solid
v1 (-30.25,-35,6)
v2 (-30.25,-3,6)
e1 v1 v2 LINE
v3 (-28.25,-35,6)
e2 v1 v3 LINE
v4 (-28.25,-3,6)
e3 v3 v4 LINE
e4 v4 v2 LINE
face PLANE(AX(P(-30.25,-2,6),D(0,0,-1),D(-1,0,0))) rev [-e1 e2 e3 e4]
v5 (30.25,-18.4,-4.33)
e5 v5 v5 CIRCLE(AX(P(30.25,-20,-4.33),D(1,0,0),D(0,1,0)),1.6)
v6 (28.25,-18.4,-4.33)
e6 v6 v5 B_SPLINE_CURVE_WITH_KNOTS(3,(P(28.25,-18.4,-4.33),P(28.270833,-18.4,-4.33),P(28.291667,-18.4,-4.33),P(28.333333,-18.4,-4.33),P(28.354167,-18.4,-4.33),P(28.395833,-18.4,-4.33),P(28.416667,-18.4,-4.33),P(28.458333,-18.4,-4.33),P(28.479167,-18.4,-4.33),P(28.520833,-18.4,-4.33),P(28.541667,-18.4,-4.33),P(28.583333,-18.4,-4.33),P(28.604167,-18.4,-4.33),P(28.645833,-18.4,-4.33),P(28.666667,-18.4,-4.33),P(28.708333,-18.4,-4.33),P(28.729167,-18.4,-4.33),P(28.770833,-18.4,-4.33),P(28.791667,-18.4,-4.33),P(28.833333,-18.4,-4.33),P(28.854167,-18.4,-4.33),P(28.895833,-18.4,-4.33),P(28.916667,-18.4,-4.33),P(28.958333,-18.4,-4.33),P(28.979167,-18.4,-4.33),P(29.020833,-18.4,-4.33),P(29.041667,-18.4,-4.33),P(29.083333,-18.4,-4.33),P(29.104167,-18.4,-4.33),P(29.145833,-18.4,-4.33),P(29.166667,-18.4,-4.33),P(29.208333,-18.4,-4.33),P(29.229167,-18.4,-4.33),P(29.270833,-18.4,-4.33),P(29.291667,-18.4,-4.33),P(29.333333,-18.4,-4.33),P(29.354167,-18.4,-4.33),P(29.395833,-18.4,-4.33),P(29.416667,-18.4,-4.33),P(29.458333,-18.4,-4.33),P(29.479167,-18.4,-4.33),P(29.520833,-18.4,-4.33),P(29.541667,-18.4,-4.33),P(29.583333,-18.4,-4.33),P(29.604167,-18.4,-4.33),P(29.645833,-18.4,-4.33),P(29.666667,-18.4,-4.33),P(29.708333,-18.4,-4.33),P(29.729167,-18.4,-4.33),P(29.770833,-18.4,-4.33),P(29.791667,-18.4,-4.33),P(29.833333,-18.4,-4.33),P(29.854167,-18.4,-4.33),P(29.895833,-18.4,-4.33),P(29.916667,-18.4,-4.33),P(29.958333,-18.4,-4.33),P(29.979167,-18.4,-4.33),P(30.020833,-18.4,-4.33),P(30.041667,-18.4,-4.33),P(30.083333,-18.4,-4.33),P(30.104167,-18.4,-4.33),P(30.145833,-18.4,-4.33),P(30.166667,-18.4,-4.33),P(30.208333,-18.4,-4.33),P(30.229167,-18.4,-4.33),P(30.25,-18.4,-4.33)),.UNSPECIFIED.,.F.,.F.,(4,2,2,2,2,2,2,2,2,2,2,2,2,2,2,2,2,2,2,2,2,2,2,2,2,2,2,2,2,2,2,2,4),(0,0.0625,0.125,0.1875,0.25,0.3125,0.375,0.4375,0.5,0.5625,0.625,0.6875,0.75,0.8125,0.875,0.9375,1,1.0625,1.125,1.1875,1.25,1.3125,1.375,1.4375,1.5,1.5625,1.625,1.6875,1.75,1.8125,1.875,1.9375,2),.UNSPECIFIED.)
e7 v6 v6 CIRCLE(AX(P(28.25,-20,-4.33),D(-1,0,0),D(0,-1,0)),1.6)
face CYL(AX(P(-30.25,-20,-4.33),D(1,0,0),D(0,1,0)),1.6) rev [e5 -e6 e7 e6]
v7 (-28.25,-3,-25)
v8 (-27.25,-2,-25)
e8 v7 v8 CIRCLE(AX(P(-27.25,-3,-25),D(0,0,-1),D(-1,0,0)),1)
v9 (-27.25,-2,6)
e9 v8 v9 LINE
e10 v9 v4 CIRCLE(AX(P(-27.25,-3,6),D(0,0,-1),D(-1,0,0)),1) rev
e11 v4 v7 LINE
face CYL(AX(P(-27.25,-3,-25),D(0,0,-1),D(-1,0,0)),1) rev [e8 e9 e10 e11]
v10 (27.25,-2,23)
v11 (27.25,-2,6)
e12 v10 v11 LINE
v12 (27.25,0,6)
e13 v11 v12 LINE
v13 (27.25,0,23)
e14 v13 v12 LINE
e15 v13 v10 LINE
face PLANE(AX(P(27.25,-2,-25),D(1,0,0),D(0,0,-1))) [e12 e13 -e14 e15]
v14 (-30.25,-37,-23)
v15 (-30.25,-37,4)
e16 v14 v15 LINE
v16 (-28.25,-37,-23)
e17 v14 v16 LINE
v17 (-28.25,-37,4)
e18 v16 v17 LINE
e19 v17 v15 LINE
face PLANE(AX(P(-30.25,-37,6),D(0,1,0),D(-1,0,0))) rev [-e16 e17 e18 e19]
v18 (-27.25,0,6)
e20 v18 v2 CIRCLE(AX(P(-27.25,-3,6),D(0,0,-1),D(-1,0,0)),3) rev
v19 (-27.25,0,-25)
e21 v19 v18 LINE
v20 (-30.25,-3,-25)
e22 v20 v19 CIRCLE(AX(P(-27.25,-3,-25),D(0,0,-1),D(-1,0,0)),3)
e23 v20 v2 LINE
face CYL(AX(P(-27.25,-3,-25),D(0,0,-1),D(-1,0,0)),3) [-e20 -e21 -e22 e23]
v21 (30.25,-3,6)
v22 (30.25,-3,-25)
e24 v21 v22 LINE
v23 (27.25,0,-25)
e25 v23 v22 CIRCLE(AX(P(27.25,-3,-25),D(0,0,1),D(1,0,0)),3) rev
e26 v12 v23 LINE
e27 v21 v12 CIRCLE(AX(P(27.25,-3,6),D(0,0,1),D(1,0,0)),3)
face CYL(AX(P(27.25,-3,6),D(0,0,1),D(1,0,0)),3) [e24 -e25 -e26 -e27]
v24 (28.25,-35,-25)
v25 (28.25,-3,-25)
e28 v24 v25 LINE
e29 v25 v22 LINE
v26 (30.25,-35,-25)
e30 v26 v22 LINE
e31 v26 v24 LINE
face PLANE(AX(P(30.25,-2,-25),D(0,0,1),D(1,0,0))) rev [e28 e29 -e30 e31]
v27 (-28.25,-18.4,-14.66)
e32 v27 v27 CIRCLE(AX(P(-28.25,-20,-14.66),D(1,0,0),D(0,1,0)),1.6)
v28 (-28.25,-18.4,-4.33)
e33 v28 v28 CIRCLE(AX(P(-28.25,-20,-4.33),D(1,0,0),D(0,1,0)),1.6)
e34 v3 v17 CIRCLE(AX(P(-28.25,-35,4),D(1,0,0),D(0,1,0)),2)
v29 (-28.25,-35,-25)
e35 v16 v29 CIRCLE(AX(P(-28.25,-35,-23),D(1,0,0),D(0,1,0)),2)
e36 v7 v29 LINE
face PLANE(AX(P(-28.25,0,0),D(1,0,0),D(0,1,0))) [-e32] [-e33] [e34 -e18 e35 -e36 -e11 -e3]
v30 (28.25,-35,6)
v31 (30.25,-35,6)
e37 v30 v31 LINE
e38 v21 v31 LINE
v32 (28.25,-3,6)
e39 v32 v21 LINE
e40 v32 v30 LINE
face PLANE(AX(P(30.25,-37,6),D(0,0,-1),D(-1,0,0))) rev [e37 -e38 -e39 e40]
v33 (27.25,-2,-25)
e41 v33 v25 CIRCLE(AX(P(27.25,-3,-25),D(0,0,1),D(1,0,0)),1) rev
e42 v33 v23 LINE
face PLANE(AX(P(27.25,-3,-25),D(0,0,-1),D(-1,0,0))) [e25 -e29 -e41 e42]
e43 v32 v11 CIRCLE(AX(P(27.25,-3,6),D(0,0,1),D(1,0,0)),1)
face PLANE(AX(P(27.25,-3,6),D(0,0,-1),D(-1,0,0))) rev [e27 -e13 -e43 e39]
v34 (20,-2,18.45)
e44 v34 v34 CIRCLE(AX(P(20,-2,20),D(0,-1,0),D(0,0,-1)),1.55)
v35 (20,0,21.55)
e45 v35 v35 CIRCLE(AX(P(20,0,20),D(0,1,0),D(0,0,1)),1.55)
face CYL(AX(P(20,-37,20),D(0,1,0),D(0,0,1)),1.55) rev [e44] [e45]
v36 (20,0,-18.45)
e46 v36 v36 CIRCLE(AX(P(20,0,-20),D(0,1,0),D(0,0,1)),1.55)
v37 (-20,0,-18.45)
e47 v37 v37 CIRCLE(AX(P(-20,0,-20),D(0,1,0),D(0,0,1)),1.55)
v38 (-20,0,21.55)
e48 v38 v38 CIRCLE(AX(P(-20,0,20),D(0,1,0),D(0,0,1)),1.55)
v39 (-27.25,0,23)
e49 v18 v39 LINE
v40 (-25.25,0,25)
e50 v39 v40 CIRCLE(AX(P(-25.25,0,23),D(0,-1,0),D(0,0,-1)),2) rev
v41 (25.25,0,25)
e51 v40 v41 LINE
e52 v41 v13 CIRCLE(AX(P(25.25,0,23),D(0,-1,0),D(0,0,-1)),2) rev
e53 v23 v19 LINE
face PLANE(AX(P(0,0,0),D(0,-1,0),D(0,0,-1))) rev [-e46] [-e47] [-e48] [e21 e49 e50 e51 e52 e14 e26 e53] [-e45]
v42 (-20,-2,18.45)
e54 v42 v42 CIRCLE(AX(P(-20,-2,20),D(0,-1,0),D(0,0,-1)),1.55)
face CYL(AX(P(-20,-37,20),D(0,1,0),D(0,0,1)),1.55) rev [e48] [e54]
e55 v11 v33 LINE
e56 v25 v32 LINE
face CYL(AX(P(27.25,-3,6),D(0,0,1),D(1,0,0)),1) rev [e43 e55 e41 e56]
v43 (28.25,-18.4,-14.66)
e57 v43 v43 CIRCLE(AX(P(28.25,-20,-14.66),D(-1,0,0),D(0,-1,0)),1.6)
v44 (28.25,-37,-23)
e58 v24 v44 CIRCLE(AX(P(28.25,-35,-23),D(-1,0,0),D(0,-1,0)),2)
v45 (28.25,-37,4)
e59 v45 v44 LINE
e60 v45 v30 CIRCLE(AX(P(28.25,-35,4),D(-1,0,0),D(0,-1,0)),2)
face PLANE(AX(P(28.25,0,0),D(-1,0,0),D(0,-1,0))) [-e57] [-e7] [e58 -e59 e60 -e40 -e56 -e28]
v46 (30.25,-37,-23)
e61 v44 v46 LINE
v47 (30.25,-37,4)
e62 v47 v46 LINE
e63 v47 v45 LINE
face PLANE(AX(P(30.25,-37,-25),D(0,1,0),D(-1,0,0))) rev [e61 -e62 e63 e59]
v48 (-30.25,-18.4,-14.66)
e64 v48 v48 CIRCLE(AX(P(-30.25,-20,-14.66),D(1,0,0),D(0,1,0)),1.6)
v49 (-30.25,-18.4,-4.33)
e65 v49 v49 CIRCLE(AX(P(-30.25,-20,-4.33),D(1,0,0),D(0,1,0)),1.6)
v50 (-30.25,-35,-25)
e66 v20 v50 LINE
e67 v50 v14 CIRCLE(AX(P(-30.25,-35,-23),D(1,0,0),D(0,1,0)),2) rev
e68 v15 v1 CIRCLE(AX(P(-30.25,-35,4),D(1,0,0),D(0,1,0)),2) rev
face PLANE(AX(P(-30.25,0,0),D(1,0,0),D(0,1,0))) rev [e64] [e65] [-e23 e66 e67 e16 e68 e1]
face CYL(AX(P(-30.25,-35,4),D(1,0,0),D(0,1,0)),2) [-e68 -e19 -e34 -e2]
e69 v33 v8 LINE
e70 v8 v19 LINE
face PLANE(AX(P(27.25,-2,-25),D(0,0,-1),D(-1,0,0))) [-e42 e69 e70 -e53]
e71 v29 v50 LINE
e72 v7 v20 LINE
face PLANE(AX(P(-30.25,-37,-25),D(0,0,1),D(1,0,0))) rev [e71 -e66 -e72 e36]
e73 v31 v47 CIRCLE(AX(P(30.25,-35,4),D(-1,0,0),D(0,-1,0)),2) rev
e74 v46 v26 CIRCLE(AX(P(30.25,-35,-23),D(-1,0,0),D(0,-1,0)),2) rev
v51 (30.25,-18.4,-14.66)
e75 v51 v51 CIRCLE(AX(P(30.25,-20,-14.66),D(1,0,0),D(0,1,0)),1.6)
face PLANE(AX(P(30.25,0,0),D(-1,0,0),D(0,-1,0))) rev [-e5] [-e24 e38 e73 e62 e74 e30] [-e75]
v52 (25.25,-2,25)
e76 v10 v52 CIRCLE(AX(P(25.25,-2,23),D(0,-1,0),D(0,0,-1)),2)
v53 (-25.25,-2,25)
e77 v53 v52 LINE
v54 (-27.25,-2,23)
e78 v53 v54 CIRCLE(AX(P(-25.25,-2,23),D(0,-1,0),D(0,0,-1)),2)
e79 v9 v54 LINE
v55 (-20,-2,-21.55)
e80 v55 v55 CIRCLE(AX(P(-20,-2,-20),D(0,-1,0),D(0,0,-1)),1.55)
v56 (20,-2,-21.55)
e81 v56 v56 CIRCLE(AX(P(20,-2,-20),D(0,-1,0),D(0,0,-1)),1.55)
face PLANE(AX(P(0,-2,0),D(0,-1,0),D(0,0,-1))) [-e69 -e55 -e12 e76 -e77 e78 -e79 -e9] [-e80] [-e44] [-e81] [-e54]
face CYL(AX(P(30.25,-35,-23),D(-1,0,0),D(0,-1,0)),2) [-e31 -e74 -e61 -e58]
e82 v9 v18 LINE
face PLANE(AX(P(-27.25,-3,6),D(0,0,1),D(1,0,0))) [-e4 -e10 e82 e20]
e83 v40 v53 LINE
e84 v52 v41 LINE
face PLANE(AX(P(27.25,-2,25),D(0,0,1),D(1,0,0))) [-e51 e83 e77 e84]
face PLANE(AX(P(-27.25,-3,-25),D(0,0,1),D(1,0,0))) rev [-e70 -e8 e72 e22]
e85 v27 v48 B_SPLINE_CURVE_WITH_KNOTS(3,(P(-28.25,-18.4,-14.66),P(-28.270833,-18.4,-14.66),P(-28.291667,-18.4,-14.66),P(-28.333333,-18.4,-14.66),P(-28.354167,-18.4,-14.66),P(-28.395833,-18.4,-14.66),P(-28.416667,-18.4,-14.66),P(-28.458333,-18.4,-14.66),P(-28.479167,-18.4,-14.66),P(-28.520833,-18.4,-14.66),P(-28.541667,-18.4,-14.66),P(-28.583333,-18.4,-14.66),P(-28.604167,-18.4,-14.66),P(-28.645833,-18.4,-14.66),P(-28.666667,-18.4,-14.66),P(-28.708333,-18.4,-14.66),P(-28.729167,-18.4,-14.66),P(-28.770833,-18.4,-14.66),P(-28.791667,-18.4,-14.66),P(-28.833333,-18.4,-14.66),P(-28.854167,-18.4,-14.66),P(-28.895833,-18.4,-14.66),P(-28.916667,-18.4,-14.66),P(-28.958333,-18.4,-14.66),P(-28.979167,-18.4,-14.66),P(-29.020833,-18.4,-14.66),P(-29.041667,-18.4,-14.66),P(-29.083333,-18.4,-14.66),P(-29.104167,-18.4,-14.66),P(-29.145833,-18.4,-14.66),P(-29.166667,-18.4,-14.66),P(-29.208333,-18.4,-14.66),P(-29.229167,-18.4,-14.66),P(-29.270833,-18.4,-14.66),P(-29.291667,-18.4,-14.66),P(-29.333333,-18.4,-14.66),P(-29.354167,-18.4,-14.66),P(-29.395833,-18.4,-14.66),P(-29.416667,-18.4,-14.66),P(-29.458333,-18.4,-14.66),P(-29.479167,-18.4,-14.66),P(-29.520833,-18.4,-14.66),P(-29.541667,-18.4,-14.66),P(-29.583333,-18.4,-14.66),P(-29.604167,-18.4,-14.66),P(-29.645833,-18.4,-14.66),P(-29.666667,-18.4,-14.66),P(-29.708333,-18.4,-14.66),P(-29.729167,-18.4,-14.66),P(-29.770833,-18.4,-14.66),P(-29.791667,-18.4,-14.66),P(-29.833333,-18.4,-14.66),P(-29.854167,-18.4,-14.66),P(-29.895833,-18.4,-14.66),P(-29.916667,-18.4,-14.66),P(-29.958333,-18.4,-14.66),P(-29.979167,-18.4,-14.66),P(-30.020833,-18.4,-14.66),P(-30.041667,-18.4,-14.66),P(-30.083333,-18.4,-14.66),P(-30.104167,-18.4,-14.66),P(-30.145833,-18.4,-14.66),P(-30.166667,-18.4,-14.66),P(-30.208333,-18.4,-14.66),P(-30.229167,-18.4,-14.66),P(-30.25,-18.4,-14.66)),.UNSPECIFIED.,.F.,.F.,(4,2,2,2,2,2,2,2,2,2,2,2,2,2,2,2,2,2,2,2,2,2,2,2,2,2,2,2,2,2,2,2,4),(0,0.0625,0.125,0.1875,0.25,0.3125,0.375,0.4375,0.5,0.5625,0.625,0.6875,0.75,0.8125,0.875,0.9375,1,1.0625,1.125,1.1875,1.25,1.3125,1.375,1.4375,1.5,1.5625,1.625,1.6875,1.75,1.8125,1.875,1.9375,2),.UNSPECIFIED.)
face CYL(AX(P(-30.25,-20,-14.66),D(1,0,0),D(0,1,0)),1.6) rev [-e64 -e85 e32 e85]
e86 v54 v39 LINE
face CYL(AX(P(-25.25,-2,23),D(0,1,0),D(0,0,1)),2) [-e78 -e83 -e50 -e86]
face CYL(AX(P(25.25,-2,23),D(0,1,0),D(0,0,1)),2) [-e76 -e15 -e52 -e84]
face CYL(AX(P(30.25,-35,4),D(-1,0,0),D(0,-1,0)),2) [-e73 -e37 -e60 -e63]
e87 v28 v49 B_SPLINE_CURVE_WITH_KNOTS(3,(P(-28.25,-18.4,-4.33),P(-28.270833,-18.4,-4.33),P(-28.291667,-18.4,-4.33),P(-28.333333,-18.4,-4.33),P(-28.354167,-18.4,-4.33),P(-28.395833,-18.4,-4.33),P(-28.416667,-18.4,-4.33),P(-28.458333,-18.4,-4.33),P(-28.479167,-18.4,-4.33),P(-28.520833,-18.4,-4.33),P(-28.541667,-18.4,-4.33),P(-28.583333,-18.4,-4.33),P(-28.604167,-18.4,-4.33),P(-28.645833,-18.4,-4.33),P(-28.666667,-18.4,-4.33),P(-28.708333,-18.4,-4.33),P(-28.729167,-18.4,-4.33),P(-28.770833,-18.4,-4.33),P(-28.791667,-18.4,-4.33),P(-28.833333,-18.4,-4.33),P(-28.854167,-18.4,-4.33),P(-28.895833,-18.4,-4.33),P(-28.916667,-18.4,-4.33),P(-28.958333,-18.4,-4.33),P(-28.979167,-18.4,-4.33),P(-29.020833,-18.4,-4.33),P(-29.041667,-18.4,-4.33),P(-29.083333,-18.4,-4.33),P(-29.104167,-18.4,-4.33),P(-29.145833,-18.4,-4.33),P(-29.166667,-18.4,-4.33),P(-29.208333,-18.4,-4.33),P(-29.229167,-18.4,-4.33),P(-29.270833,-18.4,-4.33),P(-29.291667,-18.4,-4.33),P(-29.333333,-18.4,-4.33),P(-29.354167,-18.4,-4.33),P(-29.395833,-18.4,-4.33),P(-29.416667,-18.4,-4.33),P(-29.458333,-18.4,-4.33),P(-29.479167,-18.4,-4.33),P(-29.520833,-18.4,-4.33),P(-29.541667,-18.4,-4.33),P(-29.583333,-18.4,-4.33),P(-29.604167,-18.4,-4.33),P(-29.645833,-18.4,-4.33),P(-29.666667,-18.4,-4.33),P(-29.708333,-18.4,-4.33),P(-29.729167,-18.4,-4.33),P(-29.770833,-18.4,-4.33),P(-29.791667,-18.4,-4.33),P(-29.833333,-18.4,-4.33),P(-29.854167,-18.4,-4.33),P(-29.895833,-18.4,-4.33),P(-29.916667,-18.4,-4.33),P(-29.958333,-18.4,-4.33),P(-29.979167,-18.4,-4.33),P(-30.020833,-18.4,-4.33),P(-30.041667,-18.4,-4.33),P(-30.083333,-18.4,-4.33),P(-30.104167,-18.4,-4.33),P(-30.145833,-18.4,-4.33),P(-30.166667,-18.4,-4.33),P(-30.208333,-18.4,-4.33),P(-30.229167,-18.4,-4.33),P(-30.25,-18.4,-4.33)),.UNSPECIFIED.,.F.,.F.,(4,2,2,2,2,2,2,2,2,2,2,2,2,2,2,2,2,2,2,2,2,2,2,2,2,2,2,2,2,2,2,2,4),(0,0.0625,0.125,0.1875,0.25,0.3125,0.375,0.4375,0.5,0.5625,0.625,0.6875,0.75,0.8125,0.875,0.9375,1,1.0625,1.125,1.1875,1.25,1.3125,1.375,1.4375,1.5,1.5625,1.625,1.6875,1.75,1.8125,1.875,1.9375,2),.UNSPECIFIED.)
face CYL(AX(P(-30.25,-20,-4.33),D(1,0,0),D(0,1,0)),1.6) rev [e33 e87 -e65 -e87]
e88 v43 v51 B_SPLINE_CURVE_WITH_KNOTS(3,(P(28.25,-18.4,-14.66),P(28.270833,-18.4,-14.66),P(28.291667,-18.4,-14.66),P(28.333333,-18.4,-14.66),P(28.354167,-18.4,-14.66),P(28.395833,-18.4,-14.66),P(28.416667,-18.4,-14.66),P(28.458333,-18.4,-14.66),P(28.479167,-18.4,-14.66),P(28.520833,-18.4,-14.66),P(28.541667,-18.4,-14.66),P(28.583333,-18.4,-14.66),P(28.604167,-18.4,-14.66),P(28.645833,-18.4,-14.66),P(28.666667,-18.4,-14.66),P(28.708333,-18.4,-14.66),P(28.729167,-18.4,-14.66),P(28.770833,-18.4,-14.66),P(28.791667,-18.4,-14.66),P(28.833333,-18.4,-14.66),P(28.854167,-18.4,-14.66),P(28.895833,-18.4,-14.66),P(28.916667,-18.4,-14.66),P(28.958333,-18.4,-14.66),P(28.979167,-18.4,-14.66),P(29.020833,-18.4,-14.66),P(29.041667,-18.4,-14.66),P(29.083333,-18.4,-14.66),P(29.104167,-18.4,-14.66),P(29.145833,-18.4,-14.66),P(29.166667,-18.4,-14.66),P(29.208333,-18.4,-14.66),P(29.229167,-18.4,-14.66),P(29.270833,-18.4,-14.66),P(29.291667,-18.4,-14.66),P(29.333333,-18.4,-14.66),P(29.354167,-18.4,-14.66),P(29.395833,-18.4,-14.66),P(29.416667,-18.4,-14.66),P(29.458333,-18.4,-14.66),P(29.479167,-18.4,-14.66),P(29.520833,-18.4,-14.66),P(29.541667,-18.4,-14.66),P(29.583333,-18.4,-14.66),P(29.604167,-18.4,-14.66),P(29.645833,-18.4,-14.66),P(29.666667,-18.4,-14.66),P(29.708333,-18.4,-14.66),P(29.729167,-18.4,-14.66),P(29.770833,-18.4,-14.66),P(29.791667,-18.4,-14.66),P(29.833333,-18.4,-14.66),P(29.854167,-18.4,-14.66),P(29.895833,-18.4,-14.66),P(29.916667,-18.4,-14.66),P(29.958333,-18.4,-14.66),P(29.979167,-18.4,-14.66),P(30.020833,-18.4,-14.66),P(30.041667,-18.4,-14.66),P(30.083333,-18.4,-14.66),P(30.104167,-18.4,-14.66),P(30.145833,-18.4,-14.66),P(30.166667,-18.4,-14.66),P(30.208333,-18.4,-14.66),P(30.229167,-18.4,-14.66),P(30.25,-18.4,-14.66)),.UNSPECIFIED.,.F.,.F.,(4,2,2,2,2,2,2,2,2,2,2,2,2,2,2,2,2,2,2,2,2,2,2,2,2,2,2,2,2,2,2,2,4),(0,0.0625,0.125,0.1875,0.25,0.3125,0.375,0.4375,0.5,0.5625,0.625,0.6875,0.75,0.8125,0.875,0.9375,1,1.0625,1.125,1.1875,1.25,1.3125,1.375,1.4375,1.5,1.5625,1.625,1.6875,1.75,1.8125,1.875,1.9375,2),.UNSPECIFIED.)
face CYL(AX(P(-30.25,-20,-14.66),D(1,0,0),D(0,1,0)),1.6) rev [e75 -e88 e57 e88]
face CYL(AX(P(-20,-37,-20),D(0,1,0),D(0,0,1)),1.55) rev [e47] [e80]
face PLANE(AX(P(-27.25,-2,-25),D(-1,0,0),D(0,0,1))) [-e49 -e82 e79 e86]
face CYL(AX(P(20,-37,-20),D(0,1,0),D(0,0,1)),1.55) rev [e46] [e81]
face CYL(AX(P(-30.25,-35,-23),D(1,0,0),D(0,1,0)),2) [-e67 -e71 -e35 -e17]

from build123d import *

# Parameters (mm, degrees)
SKETCH1_W               = 54.5
SKETCH1_H               = 50
BASE_FLANGE1_DEPTH      = 2
EDGE_FLANGE1_DEPTH      = 31
EDGE_FLANGE1_BEND_DEPTH = 31
SKETCH12_R              = 1.55
CUT_EXTRUDE1_DEPTH      = 54.935725637
SKETCH13_R              = 1.6
CUT_EXTRUDE2_DEPTH      = 76.194747157
BREAK_CORNER1_START     = -30.25
BREAK_CORNER1_DEPTH     = 60.5
BREAK_CORNER1_START_2   = -2
BREAK_CORNER1_2_DEPTH   = 2


# Read off the part's stored shape, not the designer's step: Break-Corner1
# Sheet-metal steps are written as plain solids
with BuildPart() as part:
    # Sketch1 → Base-Flange1 (new body)
    with BuildSketch(Plane(origin=(0, 0, 0), x_dir=(1, 0, 0), z_dir=(0, 1, 0))):
        Rectangle(SKETCH1_W, SKETCH1_H)
    extrude(amount=-BASE_FLANGE1_DEPTH)

    # Edge-Flange1 section (across the edge) → Edge-Flange1 (add)
    with BuildSketch(Plane(origin=(28.25, -2, -25), x_dir=(-1, 0, 0), z_dir=(0, 0, 1))):
        with BuildLine():
            Line((-2, 1), (-2, 35))
            Line((-2, 35), (0, 35))
            Line((0, 35), (0, 1))
            ThreePointArc((0, 1), (0.292893219, 0.292893219), (1, 0))
            Line((1, 0), (1, -2))
            ThreePointArc((1, -2), (-1.121320344, -1.121320344), (-2, 1))
        make_face()
    extrude(amount=EDGE_FLANGE1_DEPTH)

    # Edge-Flange1 section 2 (across the edge) → Edge-Flange1 bend (add)
    with BuildSketch(Plane(origin=(-28.25, -2, 6), x_dir=(1, 0, 0), z_dir=(0, 0, -1))):
        with BuildLine():
            Line((-2, 1), (-2, 35))
            Line((-2, 35), (0, 35))
            Line((0, 35), (0, 1))
            ThreePointArc((0, 1), (0.292893219, 0.292893219), (1, 0))
            Line((1, 0), (1, -2))
            ThreePointArc((1, -2), (-1.121320344, -1.121320344), (-2, 1))
        make_face()
    extrude(amount=EDGE_FLANGE1_BEND_DEPTH)

    # Sketch12 → Cut-Extrude1 (cut, through all)
    with BuildSketch(Plane(origin=(0, 0, 0), x_dir=(1, 0, 0), z_dir=(0, 1, 0))):
        with Locations(Location((-20, 20, 0), (0, 0, 270))):
            Circle(SKETCH12_R)
        with Locations(Location((20, 20, 0), (0, 0, 270))):
            Circle(SKETCH12_R)
        with Locations(Location((20, -20, 0), (0, 0, 270))):
            Circle(SKETCH12_R)
        with Locations(Location((-20, -20, 0), (0, 0, 270))):
            Circle(SKETCH12_R)
    extrude(amount=-CUT_EXTRUDE1_DEPTH, mode=Mode.SUBTRACT)

    # Sketch13 → Cut-Extrude2 (cut, through all)
    with BuildSketch(Plane(origin=(30.25, 0, 0), x_dir=(0, 0, -1), z_dir=(1, 0, 0))):
        with Locations(Location((14.66, -20, 0), (0, 0, 90))):
            Circle(SKETCH13_R)
        with Locations(Location((4.33, -20, 0), (0, 0, 90))):
            Circle(SKETCH13_R)
    extrude(amount=-CUT_EXTRUDE2_DEPTH, mode=Mode.SUBTRACT)

    # Break-Corner1 outline → Break-Corner1 (cut)
    with BuildSketch(Plane.YZ.offset(BREAK_CORNER1_START)):
        with BuildLine():
            ThreePointArc((-35, -25), (-36.414213562, -24.414213562), (-37, -23))
            Line((-37, -23), (-37, -25))
            Line((-37, -25), (-35, -25))
        make_face()
        with BuildLine():
            ThreePointArc((-37, 4), (-36.414213562, 5.414213562), (-35, 6))
            Line((-35, 6), (-37, 6))
            Line((-37, 6), (-37, 4))
        make_face()
    extrude(amount=BREAK_CORNER1_DEPTH, mode=Mode.SUBTRACT)

    # Break-Corner1 2 outline → Break-Corner1 2 (cut)
    with BuildSketch(Plane(origin=(0, 0, 0), x_dir=(1, 0, 0), z_dir=(0, 1, 0)).offset(BREAK_CORNER1_START_2)):
        with BuildLine():
            Line((-27.25, -25), (-25.25, -25))
            ThreePointArc((-25.25, -25), (-26.664213562, -24.414213562), (-27.25, -23))
            Line((-27.25, -23), (-27.25, -25))
        make_face()
        with BuildLine():
            ThreePointArc((27.25, -23), (26.664213562, -24.414213562), (25.25, -25))
            Line((25.25, -25), (27.25, -25))
            Line((27.25, -25), (27.25, -23))
        make_face()
    extrude(amount=BREAK_CORNER1_2_DEPTH, mode=Mode.SUBTRACT)


solid = part.part
